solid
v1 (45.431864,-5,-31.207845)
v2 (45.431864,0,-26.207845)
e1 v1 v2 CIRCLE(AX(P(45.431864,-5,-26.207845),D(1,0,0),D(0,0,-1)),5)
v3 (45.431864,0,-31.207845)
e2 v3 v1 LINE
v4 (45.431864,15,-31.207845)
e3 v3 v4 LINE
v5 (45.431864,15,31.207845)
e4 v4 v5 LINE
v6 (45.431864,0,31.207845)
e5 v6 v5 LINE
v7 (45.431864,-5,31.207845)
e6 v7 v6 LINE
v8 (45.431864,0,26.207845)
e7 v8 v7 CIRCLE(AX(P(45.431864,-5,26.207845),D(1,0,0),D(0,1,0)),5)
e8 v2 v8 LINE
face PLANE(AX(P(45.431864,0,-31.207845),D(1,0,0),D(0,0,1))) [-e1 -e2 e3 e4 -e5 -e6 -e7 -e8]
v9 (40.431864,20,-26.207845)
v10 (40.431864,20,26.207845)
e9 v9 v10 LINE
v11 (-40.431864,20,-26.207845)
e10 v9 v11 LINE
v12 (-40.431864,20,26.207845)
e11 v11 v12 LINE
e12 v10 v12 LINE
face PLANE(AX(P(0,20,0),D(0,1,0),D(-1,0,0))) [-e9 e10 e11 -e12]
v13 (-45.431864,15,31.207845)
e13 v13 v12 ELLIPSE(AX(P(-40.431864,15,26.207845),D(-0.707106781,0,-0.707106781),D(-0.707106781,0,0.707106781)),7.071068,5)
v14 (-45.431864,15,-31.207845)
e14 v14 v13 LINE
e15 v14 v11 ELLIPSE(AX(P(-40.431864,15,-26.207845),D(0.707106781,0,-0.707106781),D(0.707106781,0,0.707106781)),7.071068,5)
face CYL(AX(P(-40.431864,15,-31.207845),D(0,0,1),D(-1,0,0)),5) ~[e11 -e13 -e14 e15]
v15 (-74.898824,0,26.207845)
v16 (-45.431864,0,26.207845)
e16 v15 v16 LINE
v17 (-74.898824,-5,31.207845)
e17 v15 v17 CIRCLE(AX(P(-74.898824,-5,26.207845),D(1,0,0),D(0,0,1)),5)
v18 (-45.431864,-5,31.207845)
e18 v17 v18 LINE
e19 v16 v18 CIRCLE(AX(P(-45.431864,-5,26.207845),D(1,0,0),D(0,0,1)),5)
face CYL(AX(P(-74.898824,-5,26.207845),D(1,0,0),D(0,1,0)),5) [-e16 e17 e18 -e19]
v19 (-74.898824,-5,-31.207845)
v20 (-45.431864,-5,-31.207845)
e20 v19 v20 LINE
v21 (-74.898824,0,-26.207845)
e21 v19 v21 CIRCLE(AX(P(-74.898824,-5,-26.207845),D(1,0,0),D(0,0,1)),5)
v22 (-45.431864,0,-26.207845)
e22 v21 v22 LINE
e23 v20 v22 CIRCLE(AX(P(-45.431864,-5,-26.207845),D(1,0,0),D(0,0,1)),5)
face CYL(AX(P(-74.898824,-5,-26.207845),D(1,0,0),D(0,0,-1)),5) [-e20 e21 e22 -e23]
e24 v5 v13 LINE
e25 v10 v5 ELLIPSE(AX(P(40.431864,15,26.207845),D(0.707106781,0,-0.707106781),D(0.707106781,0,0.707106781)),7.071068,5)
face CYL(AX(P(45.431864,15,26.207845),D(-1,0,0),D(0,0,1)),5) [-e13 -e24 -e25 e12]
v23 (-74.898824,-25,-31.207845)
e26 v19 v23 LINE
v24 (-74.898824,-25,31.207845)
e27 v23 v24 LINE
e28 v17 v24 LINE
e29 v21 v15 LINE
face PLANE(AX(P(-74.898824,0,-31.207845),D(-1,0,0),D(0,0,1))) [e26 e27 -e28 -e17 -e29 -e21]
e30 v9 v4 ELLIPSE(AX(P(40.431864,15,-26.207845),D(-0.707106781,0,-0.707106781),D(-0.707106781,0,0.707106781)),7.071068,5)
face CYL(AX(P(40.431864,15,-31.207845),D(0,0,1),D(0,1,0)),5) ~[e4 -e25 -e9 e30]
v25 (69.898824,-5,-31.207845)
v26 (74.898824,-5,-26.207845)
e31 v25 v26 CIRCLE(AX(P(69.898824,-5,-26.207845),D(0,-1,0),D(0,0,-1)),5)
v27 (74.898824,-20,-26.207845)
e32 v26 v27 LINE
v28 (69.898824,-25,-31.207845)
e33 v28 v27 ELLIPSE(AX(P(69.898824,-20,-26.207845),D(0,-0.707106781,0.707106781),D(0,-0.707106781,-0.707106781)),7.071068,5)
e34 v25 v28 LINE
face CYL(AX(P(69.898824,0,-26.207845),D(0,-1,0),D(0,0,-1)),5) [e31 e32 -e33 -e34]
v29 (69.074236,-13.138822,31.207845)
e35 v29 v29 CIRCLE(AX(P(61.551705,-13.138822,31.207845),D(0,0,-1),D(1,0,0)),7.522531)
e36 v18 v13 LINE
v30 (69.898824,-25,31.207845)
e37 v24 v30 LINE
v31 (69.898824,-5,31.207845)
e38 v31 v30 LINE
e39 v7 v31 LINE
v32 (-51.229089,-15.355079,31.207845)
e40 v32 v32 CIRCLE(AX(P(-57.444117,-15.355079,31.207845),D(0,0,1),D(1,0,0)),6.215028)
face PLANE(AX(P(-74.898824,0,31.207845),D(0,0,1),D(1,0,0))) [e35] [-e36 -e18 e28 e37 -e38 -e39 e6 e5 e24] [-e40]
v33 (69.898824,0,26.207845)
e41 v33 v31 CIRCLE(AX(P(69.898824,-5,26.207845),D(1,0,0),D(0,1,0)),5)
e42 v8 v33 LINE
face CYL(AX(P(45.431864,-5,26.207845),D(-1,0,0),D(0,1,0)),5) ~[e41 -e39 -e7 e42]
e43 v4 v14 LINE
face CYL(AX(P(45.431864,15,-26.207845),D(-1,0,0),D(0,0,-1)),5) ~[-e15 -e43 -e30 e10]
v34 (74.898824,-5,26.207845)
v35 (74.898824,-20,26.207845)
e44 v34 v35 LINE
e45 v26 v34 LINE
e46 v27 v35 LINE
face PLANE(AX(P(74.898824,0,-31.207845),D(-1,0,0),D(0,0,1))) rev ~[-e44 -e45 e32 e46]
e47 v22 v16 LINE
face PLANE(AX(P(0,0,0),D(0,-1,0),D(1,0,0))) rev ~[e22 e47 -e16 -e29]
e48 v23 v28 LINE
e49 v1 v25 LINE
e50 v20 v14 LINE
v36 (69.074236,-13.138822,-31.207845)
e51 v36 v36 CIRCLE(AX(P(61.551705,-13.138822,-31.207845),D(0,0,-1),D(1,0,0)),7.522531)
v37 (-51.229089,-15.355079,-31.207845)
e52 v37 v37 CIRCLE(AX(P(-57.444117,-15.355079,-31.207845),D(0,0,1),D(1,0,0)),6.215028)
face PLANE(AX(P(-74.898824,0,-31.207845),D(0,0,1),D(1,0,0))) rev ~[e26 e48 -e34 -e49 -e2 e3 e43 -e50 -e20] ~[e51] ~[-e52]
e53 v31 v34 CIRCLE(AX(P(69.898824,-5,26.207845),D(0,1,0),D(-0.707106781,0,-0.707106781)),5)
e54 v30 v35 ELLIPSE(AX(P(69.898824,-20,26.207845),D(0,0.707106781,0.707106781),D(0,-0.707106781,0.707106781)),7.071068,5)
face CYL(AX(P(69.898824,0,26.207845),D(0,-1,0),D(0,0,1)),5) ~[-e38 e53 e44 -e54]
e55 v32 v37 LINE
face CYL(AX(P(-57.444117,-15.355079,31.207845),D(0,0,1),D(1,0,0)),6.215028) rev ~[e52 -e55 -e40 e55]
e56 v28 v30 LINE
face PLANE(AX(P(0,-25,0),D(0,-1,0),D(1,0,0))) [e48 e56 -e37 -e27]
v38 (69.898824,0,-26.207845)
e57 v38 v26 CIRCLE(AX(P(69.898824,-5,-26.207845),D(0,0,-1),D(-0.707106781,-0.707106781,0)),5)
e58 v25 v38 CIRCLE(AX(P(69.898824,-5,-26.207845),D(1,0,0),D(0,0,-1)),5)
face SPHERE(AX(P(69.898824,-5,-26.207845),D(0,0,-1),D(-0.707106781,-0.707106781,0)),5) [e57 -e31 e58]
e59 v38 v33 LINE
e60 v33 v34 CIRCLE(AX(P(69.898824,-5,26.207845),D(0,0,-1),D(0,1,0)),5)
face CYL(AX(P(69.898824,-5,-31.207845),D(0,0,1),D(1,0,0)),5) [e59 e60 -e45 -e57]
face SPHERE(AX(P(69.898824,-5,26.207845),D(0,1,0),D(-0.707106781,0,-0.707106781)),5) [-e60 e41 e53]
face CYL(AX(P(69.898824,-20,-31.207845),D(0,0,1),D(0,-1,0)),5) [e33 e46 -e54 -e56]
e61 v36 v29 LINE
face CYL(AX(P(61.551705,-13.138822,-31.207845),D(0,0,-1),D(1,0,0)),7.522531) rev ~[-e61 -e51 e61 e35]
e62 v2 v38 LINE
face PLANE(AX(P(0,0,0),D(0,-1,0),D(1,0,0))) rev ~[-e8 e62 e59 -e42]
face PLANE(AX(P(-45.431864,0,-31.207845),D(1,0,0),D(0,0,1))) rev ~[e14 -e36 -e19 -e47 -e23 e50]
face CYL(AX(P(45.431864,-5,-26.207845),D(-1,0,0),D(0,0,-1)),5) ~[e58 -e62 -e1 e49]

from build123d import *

# Parameters (mm, degrees)
F0_W         = 149.7976481915
F0_H         = 62.41568923
F1_DEPTH     = 25
F2_W         = 90.8637270331
F2_H         = 62.41568923
F3_DEPTH     = 20
F4_R         = 7.5225312021
F5_DEPTH     = 100
F6_R         = 6.2150283999
F7_DEPTH     = 100
F8_R         = 5
F9_T1_DEPTH  = 24.4669605792
F9_S5_W      = 5
F9_S5_H      = 5
F9_T6_DEPTH  = 5
F9_S11_W     = 5
F9_S11_H     = 5
F9_T12_DEPTH = 5
F10_R        = 5


# Not quite as in the source:
# - a fillet or chamfer that OpenCascade refuses, or shapes differently, is made with other operations: its cross-section is extruded or revolved along the edge and cut away or added


with BuildPart() as f1:
    # F0 (on Front) → F1 (new body)
    with BuildSketch(Plane.XZ):
        Rectangle(F0_W, F0_H)
    extrude(amount=F1_DEPTH)

    # F2 (on face) → F3 (join)
    with BuildSketch(Plane(origin=(0, 0, 0), x_dir=(-1, 0, 0), z_dir=(0, 1, 0))):
        Rectangle(F2_W, F2_H)
    extrude(amount=F3_DEPTH)

    # F4 (on face) → F5 (cut)
    with BuildSketch(Plane(origin=(0, 0, -31.207844615), x_dir=(1, 0, 0), z_dir=(0, 0, -1))):
        with Locations((61.5517050582, 13.1388221845)):
            Circle(F4_R)
    extrude(amount=-F5_DEPTH, mode=Mode.SUBTRACT)

    # F6 (on face) → F7 (cut)
    with BuildSketch(Plane.XY.offset(31.207844615)):
        with Locations((-57.4441173465, -15.3550794757)):
            Circle(F6_R)
    extrude(amount=-F7_DEPTH, mode=Mode.SUBTRACT)

    # F8
    f8_edges = [f1.edges().sort_by_distance(p)[0] for p in [
        (45.431864, 20, 0),
        (-45.431864, 20, 0),
        (74.898824, -12.5, -31.207845),
        (74.898824, -12.5, 31.207845),
        (74.898824, 0, 0),
        (74.898824, -25, 0),
        (0, 20, 31.207845),
        (0, 20, -31.207845),
    ]]
    fillet(f8_edges, radius=F8_R)

    # F9: fillet of radius 5 on 2 edges, made by hand

    # F9_s2 → F9_t1 (cut)
    with BuildSketch(Plane.YZ.offset(45.4318635166)):
        with BuildLine():
            ThreePointArc((-5, -31.207844615), (-1.4644660941, -29.7433785209), (0, -26.207844615))
            Line((0, -26.207844615), (0, -31.207844615))
            Line((0, -31.207844615), (-5, -31.207844615))
        make_face()
        with BuildLine():
            ThreePointArc((0, 26.207844615), (-1.4644660941, 29.7433785209), (-5, 31.207844615))
            Line((-5, 31.207844615), (0, 31.207844615))
            Line((0, 31.207844615), (0, 26.207844615))
        make_face()
    extrude(amount=F9_T1_DEPTH, mode=Mode.SUBTRACT)


with BuildPart() as f9_tool4:
    # F9_s5 → F9_t6 (new body)
    with BuildSketch(Plane.XZ.offset(5)):
        with Locations((72.3988240957, 28.707844615)):
            Rectangle(F9_S5_W, F9_S5_H)
    extrude(amount=-F9_T6_DEPTH)

    # F9_s7 → F9_t8 (revolve, cut)
    with BuildSketch(Plane(origin=(69.8988240957, -5, 26.207844615), x_dir=(-0.7071067812, 0, -0.7071067812), z_dir=(0.7071067812, 0, -0.7071067812))):
        with BuildLine():
            ThreePointArc((0, -5), (5, 0), (0, 5))
            Line((0, 5), (0, -5))
        make_face()
    revolve(axis=Axis((69.8988240957, -5, 26.207844615), (0, 1, 0)), mode=Mode.SUBTRACT)


with BuildPart() as f1_1:
    add(f1.part)

    # F9_t3: cut F9_tool4
    add(f9_tool4.part, mode=Mode.SUBTRACT)


with BuildPart() as f9_tool10:
    # F9_s11 → F9_t12 (new body)
    with BuildSketch(Plane.XY.offset(-26.207844615)):
        with Locations((72.3988240957, -2.5)):
            Rectangle(F9_S11_W, F9_S11_H)
    extrude(amount=-F9_T12_DEPTH)

    # F9_s13 → F9_t14 (revolve, cut)
    with BuildSketch(Plane(origin=(69.8988240957, -5, -26.207844615), x_dir=(-0.7071067812, -0.7071067812, 0), z_dir=(0.7071067812, -0.7071067812, 0))):
        with BuildLine():
            ThreePointArc((0, -5), (5, 0), (0, 5))
            Line((0, 5), (0, -5))
        make_face()
    revolve(axis=Axis((69.8988240957, -5, -26.207844615), (0, 0, -1)), mode=Mode.SUBTRACT)


with BuildPart() as f1_2:
    add(f1_1.part)

    # F9_t9: cut F9_tool10
    add(f9_tool10.part, mode=Mode.SUBTRACT)

    # F10
    f10_edges = [f1_2.edges().sort_by_distance(p)[0] for p in [
        (-60.165344, 0, -31.207845),
        (-60.165344, 0, 31.207845),
    ]]
    fillet(f10_edges, radius=F10_R)


solid = f1_2.part
